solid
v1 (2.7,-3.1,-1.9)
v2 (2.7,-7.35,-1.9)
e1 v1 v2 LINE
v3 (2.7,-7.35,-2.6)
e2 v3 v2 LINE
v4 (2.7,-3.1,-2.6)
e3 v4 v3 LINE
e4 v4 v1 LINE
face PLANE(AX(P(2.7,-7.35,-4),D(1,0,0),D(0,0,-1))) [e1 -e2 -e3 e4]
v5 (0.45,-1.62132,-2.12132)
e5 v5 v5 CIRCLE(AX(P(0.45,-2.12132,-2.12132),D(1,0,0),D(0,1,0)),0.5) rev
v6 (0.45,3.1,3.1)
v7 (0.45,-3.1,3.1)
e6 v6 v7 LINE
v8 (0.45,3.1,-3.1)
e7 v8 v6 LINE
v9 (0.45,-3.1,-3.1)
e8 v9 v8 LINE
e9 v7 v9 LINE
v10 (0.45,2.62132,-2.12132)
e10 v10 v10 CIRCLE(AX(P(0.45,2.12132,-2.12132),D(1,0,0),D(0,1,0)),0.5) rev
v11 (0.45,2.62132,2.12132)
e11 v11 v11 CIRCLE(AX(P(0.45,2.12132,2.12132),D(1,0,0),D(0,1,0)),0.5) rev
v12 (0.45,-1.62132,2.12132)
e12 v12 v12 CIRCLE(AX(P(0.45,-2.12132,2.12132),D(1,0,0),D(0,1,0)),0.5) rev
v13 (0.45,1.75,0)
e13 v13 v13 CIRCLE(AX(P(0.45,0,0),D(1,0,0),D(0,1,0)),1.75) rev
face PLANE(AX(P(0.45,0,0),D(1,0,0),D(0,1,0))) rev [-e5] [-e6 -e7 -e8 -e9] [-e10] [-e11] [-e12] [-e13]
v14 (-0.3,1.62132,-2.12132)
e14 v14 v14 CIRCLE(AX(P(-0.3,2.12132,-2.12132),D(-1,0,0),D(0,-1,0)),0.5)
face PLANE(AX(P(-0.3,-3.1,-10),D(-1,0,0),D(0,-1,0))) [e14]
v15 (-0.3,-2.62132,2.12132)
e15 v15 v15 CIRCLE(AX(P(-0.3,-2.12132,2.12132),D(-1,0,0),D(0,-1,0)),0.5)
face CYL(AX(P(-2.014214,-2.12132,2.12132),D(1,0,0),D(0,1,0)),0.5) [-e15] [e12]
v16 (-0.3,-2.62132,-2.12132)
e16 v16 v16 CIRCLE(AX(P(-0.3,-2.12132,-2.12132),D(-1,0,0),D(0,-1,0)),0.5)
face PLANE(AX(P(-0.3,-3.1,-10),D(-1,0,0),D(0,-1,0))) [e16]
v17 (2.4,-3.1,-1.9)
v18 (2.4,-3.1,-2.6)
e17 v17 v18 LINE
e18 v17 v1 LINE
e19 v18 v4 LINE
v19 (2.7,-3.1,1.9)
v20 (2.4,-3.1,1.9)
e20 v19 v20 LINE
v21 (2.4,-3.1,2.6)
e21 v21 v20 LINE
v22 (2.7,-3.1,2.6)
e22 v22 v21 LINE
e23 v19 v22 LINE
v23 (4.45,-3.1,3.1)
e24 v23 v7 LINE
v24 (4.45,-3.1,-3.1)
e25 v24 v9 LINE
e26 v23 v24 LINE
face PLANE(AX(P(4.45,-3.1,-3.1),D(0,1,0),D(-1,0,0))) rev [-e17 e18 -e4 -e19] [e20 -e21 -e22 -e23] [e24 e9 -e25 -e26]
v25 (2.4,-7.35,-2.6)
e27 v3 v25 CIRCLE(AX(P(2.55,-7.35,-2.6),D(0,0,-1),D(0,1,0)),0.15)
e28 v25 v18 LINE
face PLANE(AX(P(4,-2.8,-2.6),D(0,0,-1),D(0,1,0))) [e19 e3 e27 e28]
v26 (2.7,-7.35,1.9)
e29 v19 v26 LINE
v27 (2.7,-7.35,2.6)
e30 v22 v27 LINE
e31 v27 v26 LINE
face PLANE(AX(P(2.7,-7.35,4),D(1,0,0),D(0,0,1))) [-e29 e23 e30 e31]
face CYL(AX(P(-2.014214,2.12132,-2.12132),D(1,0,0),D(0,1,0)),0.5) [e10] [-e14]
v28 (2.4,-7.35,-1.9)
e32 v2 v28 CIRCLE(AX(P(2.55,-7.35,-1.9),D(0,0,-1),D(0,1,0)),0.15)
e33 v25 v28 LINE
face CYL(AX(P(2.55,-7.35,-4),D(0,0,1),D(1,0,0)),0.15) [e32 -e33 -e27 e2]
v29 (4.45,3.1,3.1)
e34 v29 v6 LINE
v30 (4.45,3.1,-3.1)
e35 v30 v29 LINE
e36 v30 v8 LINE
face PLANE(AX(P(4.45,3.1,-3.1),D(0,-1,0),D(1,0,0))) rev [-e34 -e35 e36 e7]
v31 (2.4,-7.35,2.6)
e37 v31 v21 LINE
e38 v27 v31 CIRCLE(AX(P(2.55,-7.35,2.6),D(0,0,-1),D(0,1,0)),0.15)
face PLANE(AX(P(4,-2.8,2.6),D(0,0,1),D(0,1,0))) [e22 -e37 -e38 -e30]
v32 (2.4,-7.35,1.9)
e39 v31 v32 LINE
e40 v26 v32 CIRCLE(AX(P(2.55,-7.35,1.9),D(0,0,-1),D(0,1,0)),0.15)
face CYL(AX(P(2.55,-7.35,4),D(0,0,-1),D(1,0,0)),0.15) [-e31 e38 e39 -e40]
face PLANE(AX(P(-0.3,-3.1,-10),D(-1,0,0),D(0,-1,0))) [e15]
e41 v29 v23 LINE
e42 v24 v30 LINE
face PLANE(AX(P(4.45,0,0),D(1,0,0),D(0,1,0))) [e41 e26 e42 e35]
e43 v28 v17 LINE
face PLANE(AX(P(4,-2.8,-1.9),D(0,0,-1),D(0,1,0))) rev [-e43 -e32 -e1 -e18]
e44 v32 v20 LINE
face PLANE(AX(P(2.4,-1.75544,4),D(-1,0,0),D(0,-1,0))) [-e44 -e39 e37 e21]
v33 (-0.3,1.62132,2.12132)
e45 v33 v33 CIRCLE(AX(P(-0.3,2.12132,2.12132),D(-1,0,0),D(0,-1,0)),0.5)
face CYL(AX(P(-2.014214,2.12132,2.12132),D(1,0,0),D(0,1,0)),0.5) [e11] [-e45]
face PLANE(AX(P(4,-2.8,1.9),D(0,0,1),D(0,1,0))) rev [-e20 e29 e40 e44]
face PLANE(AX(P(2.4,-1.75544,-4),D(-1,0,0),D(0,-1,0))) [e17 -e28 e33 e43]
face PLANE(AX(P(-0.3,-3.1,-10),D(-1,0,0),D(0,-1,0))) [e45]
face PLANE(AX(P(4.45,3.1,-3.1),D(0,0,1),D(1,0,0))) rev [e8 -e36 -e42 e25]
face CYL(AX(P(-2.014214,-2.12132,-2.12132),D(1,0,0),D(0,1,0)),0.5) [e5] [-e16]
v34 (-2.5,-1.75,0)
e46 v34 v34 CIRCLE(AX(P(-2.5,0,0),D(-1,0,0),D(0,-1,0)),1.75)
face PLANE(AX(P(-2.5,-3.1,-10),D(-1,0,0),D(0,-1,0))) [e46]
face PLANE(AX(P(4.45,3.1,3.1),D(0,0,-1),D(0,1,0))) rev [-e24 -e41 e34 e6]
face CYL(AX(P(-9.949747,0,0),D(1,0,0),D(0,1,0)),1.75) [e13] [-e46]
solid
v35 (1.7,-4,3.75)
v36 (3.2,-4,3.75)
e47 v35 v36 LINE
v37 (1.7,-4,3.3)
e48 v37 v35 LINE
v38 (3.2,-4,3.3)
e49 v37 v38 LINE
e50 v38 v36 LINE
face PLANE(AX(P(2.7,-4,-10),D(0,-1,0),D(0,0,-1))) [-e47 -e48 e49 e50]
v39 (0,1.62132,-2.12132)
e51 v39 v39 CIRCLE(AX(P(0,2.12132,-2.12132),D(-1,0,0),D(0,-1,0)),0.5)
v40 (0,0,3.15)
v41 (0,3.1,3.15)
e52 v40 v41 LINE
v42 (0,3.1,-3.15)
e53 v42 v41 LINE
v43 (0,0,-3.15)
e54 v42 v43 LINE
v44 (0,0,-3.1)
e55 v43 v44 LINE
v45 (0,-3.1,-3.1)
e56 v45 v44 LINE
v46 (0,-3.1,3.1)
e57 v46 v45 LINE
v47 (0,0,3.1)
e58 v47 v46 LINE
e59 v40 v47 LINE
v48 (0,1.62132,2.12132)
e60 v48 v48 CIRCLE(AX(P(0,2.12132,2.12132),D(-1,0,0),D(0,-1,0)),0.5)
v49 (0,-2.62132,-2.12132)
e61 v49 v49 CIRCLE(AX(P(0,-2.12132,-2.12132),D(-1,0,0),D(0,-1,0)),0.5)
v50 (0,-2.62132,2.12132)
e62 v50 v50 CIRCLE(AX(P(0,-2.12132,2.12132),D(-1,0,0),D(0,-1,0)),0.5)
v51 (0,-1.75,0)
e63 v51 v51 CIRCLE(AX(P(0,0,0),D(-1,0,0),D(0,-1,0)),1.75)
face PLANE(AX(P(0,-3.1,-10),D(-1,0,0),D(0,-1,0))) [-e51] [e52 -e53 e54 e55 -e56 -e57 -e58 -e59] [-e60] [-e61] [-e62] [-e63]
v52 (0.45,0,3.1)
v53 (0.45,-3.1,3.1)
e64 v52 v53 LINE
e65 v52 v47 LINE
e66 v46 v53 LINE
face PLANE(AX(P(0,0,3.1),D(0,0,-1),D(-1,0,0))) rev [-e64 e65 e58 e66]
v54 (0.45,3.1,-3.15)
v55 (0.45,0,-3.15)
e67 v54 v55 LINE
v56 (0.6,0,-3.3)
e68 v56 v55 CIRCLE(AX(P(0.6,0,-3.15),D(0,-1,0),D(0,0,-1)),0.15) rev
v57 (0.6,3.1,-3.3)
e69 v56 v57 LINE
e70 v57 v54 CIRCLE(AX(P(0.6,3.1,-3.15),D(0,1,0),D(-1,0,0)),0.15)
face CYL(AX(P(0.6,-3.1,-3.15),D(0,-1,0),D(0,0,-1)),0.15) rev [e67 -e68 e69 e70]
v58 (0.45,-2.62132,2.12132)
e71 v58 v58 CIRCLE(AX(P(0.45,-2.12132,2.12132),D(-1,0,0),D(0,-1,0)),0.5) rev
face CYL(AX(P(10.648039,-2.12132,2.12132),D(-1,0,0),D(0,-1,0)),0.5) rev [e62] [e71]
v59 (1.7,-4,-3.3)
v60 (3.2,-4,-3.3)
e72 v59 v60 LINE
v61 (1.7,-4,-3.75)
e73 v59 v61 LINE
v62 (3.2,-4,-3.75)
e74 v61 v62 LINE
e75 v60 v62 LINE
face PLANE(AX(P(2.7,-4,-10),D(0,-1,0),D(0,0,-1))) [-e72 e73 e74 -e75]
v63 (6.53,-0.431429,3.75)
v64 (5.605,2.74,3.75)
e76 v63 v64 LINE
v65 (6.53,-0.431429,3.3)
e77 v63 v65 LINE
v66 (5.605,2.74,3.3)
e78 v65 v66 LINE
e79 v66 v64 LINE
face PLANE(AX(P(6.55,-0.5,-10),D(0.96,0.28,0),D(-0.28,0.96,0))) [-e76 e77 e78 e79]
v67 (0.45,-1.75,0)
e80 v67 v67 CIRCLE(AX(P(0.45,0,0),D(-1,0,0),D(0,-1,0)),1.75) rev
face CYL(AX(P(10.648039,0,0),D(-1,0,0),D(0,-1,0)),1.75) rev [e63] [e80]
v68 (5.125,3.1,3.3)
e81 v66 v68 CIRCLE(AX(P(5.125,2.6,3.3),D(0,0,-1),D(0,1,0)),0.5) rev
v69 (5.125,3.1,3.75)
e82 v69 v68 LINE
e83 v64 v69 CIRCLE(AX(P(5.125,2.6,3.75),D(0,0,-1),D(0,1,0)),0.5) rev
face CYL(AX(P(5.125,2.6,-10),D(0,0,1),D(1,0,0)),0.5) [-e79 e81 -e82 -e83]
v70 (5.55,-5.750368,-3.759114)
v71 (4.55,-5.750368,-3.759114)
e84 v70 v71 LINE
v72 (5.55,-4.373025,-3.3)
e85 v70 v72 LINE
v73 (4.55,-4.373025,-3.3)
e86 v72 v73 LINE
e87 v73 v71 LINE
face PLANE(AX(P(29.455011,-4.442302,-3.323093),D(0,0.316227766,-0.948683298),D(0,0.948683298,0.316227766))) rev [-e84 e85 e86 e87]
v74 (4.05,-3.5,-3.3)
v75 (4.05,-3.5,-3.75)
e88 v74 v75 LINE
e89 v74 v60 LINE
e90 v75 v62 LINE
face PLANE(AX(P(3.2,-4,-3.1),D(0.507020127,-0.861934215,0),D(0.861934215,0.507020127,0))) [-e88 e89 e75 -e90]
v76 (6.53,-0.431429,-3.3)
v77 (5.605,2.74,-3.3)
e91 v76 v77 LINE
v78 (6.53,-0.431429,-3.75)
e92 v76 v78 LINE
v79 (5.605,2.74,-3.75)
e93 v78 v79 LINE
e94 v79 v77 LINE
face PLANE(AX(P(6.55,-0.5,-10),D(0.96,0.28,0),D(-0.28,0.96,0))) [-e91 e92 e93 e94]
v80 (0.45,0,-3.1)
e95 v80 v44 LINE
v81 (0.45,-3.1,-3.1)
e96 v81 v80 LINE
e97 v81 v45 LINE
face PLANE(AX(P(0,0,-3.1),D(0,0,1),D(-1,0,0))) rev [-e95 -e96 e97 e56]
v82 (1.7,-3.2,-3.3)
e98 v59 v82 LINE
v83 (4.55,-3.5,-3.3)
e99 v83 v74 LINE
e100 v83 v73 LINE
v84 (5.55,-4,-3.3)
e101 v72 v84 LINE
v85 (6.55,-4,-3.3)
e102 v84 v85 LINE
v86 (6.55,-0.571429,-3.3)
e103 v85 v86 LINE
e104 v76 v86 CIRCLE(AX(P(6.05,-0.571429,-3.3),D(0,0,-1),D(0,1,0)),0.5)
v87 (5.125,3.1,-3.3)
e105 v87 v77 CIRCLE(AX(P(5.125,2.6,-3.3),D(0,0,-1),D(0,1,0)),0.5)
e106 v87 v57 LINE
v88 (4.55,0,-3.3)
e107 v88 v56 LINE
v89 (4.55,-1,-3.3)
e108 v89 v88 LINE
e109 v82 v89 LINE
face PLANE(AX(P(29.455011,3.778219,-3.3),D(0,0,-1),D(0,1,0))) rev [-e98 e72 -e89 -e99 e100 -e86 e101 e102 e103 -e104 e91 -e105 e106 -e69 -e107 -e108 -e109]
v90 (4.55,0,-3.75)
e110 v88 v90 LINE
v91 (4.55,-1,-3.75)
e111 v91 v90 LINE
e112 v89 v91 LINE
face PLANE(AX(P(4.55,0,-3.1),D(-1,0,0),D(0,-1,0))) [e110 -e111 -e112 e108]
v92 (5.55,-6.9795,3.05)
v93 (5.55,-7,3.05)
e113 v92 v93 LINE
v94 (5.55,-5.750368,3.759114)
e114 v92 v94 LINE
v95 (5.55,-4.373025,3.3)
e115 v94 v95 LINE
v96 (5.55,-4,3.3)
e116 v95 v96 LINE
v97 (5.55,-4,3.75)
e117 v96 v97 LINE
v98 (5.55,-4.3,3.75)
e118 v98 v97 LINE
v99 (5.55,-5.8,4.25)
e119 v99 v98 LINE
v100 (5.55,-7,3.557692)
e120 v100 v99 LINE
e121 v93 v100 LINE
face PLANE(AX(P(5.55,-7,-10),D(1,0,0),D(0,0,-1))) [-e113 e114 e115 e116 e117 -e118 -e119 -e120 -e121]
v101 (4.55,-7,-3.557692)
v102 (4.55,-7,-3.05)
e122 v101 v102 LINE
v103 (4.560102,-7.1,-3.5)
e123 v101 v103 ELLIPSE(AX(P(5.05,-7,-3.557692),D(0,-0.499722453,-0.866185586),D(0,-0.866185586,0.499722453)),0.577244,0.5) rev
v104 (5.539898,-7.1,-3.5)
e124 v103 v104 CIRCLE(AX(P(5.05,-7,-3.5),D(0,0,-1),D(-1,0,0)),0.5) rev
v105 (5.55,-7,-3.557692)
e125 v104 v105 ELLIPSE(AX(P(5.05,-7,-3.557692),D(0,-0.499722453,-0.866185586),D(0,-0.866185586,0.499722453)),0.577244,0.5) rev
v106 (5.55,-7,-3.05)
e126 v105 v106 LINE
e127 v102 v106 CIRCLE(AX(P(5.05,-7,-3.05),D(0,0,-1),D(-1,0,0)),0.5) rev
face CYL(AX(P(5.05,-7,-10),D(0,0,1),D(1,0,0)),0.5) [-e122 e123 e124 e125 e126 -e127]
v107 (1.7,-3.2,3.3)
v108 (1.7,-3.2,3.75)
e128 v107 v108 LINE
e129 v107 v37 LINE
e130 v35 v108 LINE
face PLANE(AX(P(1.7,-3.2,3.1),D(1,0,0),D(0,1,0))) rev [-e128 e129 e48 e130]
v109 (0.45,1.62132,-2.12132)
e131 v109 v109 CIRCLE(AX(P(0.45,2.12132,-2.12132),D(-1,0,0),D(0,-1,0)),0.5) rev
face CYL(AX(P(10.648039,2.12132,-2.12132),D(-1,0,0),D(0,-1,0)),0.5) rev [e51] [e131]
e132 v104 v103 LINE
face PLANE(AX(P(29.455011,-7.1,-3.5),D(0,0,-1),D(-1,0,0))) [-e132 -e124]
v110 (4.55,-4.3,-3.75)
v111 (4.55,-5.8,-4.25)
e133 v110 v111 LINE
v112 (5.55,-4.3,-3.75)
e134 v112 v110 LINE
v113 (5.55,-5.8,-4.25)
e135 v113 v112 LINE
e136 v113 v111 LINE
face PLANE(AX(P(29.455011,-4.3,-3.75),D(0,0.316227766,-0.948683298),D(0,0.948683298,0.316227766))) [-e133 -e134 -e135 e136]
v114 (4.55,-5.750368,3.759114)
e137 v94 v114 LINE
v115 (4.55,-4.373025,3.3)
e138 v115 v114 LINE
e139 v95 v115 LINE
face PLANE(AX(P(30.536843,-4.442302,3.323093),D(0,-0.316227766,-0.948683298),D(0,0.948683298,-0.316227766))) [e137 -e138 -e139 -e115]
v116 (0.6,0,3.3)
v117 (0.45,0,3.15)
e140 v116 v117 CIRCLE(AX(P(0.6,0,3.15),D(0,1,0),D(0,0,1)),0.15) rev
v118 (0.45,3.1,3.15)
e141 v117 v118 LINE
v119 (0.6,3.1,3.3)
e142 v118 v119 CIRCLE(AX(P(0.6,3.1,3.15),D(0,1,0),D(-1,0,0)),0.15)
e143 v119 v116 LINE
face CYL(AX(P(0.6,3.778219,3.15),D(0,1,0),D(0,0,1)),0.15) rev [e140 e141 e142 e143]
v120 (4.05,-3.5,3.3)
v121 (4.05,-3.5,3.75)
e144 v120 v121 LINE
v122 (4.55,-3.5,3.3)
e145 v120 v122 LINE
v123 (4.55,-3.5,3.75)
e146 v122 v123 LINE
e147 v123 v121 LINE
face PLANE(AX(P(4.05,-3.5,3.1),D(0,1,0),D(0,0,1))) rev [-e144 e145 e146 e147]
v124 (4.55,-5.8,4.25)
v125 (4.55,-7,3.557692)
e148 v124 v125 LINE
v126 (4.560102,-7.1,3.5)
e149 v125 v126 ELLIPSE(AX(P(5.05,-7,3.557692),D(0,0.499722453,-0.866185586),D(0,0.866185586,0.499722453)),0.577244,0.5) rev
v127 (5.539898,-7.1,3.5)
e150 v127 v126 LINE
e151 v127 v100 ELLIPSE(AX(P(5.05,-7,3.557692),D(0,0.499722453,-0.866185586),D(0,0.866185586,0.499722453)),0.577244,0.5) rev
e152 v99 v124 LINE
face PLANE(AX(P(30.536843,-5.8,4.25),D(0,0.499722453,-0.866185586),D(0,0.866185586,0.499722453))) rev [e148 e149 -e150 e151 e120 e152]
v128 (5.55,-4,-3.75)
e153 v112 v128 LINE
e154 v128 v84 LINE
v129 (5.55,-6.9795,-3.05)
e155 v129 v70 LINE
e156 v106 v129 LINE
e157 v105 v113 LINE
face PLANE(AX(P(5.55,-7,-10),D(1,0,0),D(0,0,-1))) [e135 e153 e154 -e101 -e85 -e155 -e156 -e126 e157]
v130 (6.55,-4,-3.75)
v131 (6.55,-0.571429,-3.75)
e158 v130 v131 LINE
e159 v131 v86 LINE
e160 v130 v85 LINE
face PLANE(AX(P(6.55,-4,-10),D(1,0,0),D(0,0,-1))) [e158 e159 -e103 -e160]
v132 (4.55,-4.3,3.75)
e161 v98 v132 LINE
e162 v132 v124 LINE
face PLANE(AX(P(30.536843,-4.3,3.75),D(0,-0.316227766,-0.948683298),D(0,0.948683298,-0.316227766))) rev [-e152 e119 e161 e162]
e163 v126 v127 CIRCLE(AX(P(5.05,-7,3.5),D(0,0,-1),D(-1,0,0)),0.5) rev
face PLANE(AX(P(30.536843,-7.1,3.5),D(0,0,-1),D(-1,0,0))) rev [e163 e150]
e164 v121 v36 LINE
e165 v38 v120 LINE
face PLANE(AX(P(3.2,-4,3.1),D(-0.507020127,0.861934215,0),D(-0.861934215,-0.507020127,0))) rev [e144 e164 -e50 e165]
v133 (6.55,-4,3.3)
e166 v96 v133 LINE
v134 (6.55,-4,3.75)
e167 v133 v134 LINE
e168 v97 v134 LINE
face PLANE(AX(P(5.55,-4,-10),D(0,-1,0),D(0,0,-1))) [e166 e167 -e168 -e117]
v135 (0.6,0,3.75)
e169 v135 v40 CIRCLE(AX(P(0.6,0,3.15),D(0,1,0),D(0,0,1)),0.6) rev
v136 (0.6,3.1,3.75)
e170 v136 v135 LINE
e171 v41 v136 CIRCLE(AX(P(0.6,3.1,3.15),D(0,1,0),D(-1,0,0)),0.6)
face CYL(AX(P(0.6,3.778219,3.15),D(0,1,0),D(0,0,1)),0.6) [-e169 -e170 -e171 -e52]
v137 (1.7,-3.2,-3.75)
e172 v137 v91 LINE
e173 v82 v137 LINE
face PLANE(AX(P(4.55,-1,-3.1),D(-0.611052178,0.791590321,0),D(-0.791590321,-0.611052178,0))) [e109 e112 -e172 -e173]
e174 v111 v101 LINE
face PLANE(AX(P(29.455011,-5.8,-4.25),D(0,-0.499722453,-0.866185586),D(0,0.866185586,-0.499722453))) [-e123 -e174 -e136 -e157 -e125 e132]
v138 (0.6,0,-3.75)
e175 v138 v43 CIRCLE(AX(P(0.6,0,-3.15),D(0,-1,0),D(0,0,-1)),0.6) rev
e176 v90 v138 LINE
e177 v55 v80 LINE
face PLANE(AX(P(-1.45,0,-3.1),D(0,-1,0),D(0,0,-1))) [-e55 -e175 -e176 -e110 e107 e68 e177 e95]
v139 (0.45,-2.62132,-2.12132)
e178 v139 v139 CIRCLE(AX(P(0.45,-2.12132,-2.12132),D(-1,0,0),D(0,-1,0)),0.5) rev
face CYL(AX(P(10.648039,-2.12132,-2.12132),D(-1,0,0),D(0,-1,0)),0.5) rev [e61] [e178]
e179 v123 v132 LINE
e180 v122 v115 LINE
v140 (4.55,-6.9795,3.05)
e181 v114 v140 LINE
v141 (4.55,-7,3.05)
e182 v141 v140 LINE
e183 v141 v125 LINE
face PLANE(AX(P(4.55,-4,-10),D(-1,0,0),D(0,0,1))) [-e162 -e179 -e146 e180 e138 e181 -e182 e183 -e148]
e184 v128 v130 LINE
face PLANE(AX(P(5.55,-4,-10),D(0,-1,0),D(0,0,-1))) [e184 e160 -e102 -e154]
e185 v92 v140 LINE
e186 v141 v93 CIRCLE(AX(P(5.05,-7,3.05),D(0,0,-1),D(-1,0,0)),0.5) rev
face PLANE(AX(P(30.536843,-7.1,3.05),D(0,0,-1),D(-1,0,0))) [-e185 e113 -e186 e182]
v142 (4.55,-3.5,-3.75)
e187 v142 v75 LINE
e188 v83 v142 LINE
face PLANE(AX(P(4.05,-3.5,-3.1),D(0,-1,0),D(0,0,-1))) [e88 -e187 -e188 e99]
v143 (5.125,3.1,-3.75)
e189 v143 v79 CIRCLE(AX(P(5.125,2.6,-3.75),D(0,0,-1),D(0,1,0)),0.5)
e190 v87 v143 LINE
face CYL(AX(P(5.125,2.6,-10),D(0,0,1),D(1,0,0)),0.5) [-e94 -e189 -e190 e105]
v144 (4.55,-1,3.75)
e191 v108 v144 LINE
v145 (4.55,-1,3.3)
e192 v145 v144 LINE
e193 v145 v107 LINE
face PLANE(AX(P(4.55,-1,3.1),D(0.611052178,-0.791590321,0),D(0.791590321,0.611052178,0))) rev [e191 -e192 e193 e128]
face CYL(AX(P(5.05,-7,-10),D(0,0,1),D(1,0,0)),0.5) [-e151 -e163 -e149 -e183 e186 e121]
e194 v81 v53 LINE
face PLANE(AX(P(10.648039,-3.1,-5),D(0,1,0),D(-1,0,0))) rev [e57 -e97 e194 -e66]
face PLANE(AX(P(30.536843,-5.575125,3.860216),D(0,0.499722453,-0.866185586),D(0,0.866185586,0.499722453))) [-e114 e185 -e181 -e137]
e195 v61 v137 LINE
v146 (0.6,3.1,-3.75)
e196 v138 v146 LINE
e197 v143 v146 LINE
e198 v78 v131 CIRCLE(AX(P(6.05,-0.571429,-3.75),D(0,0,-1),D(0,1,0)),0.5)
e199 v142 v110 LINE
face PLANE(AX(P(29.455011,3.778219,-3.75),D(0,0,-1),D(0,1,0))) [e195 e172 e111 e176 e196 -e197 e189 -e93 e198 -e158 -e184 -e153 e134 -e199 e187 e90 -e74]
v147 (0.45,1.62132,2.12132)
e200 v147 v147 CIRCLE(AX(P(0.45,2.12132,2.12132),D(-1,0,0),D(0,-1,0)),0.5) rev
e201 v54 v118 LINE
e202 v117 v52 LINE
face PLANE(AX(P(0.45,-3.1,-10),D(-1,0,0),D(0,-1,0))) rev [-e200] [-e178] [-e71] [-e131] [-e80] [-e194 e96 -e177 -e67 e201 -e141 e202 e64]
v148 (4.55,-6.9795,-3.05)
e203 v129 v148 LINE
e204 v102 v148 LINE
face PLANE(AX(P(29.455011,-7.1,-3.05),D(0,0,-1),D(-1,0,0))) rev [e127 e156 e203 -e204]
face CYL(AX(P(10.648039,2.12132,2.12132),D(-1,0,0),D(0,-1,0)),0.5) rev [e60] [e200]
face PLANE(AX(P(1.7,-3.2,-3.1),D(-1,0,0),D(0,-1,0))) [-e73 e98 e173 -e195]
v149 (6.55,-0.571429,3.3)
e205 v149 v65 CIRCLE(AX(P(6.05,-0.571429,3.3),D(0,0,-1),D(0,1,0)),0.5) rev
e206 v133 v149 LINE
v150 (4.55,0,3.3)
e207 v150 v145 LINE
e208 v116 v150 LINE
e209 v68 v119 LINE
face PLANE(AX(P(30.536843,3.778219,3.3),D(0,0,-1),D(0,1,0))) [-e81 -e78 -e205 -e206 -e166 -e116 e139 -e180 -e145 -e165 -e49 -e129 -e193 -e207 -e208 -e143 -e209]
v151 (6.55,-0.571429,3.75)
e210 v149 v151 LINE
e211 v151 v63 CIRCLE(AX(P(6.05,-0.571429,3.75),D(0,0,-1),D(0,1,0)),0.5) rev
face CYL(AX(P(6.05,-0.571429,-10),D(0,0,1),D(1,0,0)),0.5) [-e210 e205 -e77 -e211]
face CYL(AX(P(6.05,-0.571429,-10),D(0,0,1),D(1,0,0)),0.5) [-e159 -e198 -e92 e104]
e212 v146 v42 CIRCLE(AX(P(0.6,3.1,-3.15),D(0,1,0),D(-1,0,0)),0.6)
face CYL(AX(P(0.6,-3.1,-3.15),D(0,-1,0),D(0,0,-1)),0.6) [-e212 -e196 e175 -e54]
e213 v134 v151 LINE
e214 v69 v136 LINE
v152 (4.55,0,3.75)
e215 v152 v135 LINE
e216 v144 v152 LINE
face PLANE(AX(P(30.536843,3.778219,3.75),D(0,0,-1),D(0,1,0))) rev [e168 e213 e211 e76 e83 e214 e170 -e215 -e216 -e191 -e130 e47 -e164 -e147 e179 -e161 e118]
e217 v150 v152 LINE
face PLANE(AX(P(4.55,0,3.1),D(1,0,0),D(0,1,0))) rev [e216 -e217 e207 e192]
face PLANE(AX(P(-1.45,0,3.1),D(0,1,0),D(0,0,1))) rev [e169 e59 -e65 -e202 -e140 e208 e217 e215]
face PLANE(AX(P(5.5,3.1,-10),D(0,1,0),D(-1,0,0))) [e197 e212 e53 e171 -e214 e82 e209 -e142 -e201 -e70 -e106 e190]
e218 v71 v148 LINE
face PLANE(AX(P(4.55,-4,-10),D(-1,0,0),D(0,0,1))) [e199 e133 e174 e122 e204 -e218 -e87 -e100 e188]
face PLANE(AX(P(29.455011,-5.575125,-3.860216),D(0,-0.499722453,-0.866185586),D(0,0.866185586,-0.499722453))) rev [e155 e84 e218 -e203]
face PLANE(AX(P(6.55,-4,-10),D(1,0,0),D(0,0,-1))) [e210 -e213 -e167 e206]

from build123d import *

# Parameters (mm, degrees)
EXTRUDE_1_DEPTH      = 10
EXTRUDE_1_DEPTH_BACK = 10
CUT_EXTRUDE_1_DEPTH  = 15.112140164
FILLET_1_R           = 0.6
FILLET_2_R           = 0.5
SHELL_START          = 0.6
SHELL_1_OUTLINE_W    = 7.1
SHELL_1_OUTLINE_H    = 6.6
SHELL_1_DEPTH        = 5.95
SHELL_START_2        = -8
SHELL_1_2_OUTLINE_W  = 1
SHELL_1_2_OUTLINE_H  = 6.1
SHELL_1_2_DEPTH      = 11.1
SHELL_START_3        = 4.55
SHELL_1_3_DEPTH      = 1
CUT_EXTRUDE_2_DEPTH  = 0.65
SKETCH_5_R           = 0.5
SKETCH_5_R_2         = 1.75
SKETCH_5_W           = 10
SKETCH_5_H           = 2
CUT_EXTRUDE_3_DEPTH  = 0.45
SKETCH_6_W           = 6.2
SKETCH_6_H           = 6.2
EXTRUDE_2_DEPTH      = 4
SKETCH_7_W           = 0.7
SKETCH_7_H           = 5
EXTRUDE_1_2_DEPTH    = 4
SKETCH_8_OUTSIDE_W   = 11.61
SKETCH_8_OUTSIDE_H   = 15.96
CUT_EXTRUDE_4_DEPTH  = 4
EXTRUDE_START        = 0.75
SKETCH_9_R           = 0.5
EXTRUDE_3_DEPTH      = 0.75
EXTRUDE_START_2      = 2.95
SKETCH_9_4_R         = 1.75
EXTRUDE_4_DEPTH      = 2.95


with BuildPart() as part:
    # 草图1 → Extrude 1 (new, two sides: drawn at the far end of the back side and taken through both)
    with BuildSketch(Plane.XY.offset(-EXTRUDE_1_DEPTH_BACK)):
        with BuildLine():
            Line((0, 3.1), (0, -3.1))
            Line((0, -3.1), (0, -4))
            Line((0, -4), (2.4, -4))
            Line((2.4, -4), (2.7, -4))
            Line((2.7, -4), (4.55, -4))
            Line((4.55, -4), (4.55, -7))
            ThreePointArc((4.55, -7), (5.05, -7.5), (5.55, -7))
            Line((5.55, -7), (5.55, -4))
            Line((5.55, -4), (6.55, -4))
            Line((6.55, -4), (6.55, -0.5))
            Line((6.55, -0.5), (5.5, 3.1))
            Line((5.5, 3.1), (0, 3.1))
        make_face()
    extrude(amount=EXTRUDE_1_DEPTH + EXTRUDE_1_DEPTH_BACK)

    # 草图2 → 切除-拉伸1 (cut, symmetric)
    with BuildSketch(Plane(origin=(0, 0, 0), x_dir=(0, 0, -1), z_dir=(1, 0, 0))):
        Polygon((3.75, 49.345660633), (3.75, 3.778219056), (3.75, -4.3), (4.25, -5.8), (3.5, -7.1), (3.5, -7.992367687), (3.5, -53.559809264), (94.634614214, -53.781212981), (94.884614214, 49.124256916), align=None)
    cut_extrude_1 = extrude(amount=CUT_EXTRUDE_1_DEPTH, both=True, mode=Mode.SUBTRACT)

    # 镜向1: 切除-拉伸1 across plane
    add(cut_extrude_1.mirror(Plane.XY), mode=Mode.SUBTRACT)

    # 圆角1
    fillet_1_edges = [part.edges().sort_by_distance(p)[0] for p in [
        (0, -0.45, -3.75),
        (0, -0.45, 3.75),
    ]]
    fillet(fillet_1_edges, radius=FILLET_1_R)

    # 圆角2
    fillet_2_edges = [part.edges().sort_by_distance(p)[0] for p in [
        (6.55, -0.5, 0),
        (5.5, 3.1, 0),
    ]]
    fillet(fillet_2_edges, radius=FILLET_2_R)

    # 抽壳1: read off the stored shape, not the designer's step
    # 抽壳1 outline → 抽壳1 (cut)
    with BuildSketch(Plane.YZ.offset(SHELL_START)):
        with Locations((-0.45, 0)):
            Rectangle(SHELL_1_OUTLINE_W, SHELL_1_OUTLINE_H)
    extrude(amount=SHELL_1_DEPTH, mode=Mode.SUBTRACT)

    # Shell 1 2 outline → Shell 1 2 (cut)
    with BuildSketch(Plane(origin=(0, 0, 0), x_dir=(1, 0, 0), z_dir=(0, 1, 0)).offset(SHELL_START_2)):
        with BuildLine():
            ThreePointArc((0.6, 3.3), (0.493933983, 3.256066017), (0.45, 3.15))
            Line((0.45, 3.15), (0.45, -3.15))
            ThreePointArc((0.45, -3.15), (0.493933983, -3.256066017), (0.6, -3.3))
            Line((0.6, -3.3), (0.6, 3.3))
        make_face()
        with Locations((5.05, 0)):
            Rectangle(SHELL_1_2_OUTLINE_W, SHELL_1_2_OUTLINE_H)
    extrude(amount=SHELL_1_2_DEPTH, mode=Mode.SUBTRACT)

    # Shell 1 3 outline → Shell 1 3 (cut)
    with BuildSketch(Plane.YZ.offset(SHELL_START_3)):
        Polygon((-6.979500139, -3.05), (-5.750368378, -3.759114477), (-4.373024947, -3.3), (-4, -3.3), (-4, -3.05), align=None)
        Polygon((-4.373024947, 3.3), (-5.750368378, 3.759114477), (-6.979500139, 3.05), (-4, 3.05), (-4, 3.3), align=None)
    extrude(amount=SHELL_1_3_DEPTH, mode=Mode.SUBTRACT)

    # 草图4 → 切除-拉伸2 (cut)
    with BuildSketch(Plane.XY.offset(3.75)):
        Polygon((-1.45, 0), (4.55, 0), (4.55, -1), (1.7, -3.2), (1.7, -4), (3.2, -4), (4.05, -3.5), (4.55, -3.5), (4.55, -9.5), (-1.45, -9.5), align=None)
    cut_extrude_2 = extrude(amount=-CUT_EXTRUDE_2_DEPTH, mode=Mode.SUBTRACT)

    # 镜向2: 切除-拉伸2 across plane
    add(cut_extrude_2.mirror(Plane.XY), mode=Mode.SUBTRACT)

    # 草图5 → 切除-拉伸3 (cut)
    with BuildSketch(Plane.ZY):
        with Locations(Location((-2.121320344, 2.121320344, 0), (0, 0, 270))):
            Circle(SKETCH_5_R)
        with Locations(Location((2.121320344, 2.121320344, 0), (0, 0, 270))):
            Circle(SKETCH_5_R)
        with Locations(Location((2.121320344, -2.121320344, 0), (0, 0, 270))):
            Circle(SKETCH_5_R)
        with Locations(Location((-2.121320344, -2.121320344, 0), (0, 0, 270))):
            Circle(SKETCH_5_R)
        with Locations(Location((0, 0, 0), (0, 0, 270))):
            Circle(SKETCH_5_R_2)
        with Locations((0, -4.1)):
            Rectangle(SKETCH_5_W, SKETCH_5_H)
    extrude(amount=-CUT_EXTRUDE_3_DEPTH, mode=Mode.SUBTRACT)


with BuildPart() as body_2:
    # 草图6 → 凸台-拉伸2 (new body)
    with BuildSketch(Plane(origin=(0.45, 0, 0), x_dir=(0, 0, -1), z_dir=(1, 0, 0))):
        Rectangle(SKETCH_6_W, SKETCH_6_H)
    extrude(amount=EXTRUDE_2_DEPTH)


with BuildPart() as body_3:
    # 草图7 → Extrude 1 2 (new body)
    with BuildSketch(Plane(origin=(0, 0, 0), x_dir=(0, 0, -1), z_dir=(1, 0, 0))):
        with Locations((2.25, -5.3)):
            Rectangle(SKETCH_7_W, SKETCH_7_H)
    extrude(amount=EXTRUDE_1_2_DEPTH)

    # 草图8 outside → 切除-拉伸4 (cut)
    with BuildSketch(Plane.XY):
        with Locations((3.275, -2.35)):
            Rectangle(SKETCH_8_OUTSIDE_W, SKETCH_8_OUTSIDE_H)
        with BuildLine():
            Line((2.7, -7.35), (2.7, -1.755439518))
            Line((2.7, -1.755439518), (2.4, -1.755439518))
            Line((2.4, -1.755439518), (2.4, -7.35))
            ThreePointArc((2.4, -7.35), (2.55, -7.5), (2.7, -7.35))
        make_face(mode=Mode.SUBTRACT)
    extrude(amount=-CUT_EXTRUDE_4_DEPTH, mode=Mode.SUBTRACT)


with BuildPart() as body_4:
    # 镜向3: mirrored copy
    add(body_3.part.mirror(Plane.XY))


with BuildPart() as body_3_1:
    add(body_3.part)

    # Combine 1: union body 4, body 2
    add(body_4.part)
    add(body_2.part)

    # 草图9 → 凸台-拉伸3 (add)
    with BuildSketch(Plane.ZY.offset(-0.45).offset(EXTRUDE_START)):
        with Locations(Location((-2.121320344, 2.121320344, 0), (0, 0, 90))):
            Circle(SKETCH_9_R)
        with Locations(Location((2.121320344, 2.121320344, 0), (0, 0, 90))):
            Circle(SKETCH_9_R)
        with Locations(Location((2.121320344, -2.121320344, 0), (0, 0, 90))):
            Circle(SKETCH_9_R)
        with Locations(Location((-2.121320344, -2.121320344, 0), (0, 0, 90))):
            Circle(SKETCH_9_R)
    extrude(amount=-EXTRUDE_3_DEPTH)

    # 草图9<4> → 凸台-拉伸4 (add)
    with BuildSketch(Plane.ZY.offset(-0.45).offset(EXTRUDE_START_2)):
        with Locations(Location((0, 0, 0), (0, 0, 90))):
            Circle(SKETCH_9_4_R)
    extrude(amount=-EXTRUDE_4_DEPTH)


solid = Compound([part.part, body_3_1.part])
